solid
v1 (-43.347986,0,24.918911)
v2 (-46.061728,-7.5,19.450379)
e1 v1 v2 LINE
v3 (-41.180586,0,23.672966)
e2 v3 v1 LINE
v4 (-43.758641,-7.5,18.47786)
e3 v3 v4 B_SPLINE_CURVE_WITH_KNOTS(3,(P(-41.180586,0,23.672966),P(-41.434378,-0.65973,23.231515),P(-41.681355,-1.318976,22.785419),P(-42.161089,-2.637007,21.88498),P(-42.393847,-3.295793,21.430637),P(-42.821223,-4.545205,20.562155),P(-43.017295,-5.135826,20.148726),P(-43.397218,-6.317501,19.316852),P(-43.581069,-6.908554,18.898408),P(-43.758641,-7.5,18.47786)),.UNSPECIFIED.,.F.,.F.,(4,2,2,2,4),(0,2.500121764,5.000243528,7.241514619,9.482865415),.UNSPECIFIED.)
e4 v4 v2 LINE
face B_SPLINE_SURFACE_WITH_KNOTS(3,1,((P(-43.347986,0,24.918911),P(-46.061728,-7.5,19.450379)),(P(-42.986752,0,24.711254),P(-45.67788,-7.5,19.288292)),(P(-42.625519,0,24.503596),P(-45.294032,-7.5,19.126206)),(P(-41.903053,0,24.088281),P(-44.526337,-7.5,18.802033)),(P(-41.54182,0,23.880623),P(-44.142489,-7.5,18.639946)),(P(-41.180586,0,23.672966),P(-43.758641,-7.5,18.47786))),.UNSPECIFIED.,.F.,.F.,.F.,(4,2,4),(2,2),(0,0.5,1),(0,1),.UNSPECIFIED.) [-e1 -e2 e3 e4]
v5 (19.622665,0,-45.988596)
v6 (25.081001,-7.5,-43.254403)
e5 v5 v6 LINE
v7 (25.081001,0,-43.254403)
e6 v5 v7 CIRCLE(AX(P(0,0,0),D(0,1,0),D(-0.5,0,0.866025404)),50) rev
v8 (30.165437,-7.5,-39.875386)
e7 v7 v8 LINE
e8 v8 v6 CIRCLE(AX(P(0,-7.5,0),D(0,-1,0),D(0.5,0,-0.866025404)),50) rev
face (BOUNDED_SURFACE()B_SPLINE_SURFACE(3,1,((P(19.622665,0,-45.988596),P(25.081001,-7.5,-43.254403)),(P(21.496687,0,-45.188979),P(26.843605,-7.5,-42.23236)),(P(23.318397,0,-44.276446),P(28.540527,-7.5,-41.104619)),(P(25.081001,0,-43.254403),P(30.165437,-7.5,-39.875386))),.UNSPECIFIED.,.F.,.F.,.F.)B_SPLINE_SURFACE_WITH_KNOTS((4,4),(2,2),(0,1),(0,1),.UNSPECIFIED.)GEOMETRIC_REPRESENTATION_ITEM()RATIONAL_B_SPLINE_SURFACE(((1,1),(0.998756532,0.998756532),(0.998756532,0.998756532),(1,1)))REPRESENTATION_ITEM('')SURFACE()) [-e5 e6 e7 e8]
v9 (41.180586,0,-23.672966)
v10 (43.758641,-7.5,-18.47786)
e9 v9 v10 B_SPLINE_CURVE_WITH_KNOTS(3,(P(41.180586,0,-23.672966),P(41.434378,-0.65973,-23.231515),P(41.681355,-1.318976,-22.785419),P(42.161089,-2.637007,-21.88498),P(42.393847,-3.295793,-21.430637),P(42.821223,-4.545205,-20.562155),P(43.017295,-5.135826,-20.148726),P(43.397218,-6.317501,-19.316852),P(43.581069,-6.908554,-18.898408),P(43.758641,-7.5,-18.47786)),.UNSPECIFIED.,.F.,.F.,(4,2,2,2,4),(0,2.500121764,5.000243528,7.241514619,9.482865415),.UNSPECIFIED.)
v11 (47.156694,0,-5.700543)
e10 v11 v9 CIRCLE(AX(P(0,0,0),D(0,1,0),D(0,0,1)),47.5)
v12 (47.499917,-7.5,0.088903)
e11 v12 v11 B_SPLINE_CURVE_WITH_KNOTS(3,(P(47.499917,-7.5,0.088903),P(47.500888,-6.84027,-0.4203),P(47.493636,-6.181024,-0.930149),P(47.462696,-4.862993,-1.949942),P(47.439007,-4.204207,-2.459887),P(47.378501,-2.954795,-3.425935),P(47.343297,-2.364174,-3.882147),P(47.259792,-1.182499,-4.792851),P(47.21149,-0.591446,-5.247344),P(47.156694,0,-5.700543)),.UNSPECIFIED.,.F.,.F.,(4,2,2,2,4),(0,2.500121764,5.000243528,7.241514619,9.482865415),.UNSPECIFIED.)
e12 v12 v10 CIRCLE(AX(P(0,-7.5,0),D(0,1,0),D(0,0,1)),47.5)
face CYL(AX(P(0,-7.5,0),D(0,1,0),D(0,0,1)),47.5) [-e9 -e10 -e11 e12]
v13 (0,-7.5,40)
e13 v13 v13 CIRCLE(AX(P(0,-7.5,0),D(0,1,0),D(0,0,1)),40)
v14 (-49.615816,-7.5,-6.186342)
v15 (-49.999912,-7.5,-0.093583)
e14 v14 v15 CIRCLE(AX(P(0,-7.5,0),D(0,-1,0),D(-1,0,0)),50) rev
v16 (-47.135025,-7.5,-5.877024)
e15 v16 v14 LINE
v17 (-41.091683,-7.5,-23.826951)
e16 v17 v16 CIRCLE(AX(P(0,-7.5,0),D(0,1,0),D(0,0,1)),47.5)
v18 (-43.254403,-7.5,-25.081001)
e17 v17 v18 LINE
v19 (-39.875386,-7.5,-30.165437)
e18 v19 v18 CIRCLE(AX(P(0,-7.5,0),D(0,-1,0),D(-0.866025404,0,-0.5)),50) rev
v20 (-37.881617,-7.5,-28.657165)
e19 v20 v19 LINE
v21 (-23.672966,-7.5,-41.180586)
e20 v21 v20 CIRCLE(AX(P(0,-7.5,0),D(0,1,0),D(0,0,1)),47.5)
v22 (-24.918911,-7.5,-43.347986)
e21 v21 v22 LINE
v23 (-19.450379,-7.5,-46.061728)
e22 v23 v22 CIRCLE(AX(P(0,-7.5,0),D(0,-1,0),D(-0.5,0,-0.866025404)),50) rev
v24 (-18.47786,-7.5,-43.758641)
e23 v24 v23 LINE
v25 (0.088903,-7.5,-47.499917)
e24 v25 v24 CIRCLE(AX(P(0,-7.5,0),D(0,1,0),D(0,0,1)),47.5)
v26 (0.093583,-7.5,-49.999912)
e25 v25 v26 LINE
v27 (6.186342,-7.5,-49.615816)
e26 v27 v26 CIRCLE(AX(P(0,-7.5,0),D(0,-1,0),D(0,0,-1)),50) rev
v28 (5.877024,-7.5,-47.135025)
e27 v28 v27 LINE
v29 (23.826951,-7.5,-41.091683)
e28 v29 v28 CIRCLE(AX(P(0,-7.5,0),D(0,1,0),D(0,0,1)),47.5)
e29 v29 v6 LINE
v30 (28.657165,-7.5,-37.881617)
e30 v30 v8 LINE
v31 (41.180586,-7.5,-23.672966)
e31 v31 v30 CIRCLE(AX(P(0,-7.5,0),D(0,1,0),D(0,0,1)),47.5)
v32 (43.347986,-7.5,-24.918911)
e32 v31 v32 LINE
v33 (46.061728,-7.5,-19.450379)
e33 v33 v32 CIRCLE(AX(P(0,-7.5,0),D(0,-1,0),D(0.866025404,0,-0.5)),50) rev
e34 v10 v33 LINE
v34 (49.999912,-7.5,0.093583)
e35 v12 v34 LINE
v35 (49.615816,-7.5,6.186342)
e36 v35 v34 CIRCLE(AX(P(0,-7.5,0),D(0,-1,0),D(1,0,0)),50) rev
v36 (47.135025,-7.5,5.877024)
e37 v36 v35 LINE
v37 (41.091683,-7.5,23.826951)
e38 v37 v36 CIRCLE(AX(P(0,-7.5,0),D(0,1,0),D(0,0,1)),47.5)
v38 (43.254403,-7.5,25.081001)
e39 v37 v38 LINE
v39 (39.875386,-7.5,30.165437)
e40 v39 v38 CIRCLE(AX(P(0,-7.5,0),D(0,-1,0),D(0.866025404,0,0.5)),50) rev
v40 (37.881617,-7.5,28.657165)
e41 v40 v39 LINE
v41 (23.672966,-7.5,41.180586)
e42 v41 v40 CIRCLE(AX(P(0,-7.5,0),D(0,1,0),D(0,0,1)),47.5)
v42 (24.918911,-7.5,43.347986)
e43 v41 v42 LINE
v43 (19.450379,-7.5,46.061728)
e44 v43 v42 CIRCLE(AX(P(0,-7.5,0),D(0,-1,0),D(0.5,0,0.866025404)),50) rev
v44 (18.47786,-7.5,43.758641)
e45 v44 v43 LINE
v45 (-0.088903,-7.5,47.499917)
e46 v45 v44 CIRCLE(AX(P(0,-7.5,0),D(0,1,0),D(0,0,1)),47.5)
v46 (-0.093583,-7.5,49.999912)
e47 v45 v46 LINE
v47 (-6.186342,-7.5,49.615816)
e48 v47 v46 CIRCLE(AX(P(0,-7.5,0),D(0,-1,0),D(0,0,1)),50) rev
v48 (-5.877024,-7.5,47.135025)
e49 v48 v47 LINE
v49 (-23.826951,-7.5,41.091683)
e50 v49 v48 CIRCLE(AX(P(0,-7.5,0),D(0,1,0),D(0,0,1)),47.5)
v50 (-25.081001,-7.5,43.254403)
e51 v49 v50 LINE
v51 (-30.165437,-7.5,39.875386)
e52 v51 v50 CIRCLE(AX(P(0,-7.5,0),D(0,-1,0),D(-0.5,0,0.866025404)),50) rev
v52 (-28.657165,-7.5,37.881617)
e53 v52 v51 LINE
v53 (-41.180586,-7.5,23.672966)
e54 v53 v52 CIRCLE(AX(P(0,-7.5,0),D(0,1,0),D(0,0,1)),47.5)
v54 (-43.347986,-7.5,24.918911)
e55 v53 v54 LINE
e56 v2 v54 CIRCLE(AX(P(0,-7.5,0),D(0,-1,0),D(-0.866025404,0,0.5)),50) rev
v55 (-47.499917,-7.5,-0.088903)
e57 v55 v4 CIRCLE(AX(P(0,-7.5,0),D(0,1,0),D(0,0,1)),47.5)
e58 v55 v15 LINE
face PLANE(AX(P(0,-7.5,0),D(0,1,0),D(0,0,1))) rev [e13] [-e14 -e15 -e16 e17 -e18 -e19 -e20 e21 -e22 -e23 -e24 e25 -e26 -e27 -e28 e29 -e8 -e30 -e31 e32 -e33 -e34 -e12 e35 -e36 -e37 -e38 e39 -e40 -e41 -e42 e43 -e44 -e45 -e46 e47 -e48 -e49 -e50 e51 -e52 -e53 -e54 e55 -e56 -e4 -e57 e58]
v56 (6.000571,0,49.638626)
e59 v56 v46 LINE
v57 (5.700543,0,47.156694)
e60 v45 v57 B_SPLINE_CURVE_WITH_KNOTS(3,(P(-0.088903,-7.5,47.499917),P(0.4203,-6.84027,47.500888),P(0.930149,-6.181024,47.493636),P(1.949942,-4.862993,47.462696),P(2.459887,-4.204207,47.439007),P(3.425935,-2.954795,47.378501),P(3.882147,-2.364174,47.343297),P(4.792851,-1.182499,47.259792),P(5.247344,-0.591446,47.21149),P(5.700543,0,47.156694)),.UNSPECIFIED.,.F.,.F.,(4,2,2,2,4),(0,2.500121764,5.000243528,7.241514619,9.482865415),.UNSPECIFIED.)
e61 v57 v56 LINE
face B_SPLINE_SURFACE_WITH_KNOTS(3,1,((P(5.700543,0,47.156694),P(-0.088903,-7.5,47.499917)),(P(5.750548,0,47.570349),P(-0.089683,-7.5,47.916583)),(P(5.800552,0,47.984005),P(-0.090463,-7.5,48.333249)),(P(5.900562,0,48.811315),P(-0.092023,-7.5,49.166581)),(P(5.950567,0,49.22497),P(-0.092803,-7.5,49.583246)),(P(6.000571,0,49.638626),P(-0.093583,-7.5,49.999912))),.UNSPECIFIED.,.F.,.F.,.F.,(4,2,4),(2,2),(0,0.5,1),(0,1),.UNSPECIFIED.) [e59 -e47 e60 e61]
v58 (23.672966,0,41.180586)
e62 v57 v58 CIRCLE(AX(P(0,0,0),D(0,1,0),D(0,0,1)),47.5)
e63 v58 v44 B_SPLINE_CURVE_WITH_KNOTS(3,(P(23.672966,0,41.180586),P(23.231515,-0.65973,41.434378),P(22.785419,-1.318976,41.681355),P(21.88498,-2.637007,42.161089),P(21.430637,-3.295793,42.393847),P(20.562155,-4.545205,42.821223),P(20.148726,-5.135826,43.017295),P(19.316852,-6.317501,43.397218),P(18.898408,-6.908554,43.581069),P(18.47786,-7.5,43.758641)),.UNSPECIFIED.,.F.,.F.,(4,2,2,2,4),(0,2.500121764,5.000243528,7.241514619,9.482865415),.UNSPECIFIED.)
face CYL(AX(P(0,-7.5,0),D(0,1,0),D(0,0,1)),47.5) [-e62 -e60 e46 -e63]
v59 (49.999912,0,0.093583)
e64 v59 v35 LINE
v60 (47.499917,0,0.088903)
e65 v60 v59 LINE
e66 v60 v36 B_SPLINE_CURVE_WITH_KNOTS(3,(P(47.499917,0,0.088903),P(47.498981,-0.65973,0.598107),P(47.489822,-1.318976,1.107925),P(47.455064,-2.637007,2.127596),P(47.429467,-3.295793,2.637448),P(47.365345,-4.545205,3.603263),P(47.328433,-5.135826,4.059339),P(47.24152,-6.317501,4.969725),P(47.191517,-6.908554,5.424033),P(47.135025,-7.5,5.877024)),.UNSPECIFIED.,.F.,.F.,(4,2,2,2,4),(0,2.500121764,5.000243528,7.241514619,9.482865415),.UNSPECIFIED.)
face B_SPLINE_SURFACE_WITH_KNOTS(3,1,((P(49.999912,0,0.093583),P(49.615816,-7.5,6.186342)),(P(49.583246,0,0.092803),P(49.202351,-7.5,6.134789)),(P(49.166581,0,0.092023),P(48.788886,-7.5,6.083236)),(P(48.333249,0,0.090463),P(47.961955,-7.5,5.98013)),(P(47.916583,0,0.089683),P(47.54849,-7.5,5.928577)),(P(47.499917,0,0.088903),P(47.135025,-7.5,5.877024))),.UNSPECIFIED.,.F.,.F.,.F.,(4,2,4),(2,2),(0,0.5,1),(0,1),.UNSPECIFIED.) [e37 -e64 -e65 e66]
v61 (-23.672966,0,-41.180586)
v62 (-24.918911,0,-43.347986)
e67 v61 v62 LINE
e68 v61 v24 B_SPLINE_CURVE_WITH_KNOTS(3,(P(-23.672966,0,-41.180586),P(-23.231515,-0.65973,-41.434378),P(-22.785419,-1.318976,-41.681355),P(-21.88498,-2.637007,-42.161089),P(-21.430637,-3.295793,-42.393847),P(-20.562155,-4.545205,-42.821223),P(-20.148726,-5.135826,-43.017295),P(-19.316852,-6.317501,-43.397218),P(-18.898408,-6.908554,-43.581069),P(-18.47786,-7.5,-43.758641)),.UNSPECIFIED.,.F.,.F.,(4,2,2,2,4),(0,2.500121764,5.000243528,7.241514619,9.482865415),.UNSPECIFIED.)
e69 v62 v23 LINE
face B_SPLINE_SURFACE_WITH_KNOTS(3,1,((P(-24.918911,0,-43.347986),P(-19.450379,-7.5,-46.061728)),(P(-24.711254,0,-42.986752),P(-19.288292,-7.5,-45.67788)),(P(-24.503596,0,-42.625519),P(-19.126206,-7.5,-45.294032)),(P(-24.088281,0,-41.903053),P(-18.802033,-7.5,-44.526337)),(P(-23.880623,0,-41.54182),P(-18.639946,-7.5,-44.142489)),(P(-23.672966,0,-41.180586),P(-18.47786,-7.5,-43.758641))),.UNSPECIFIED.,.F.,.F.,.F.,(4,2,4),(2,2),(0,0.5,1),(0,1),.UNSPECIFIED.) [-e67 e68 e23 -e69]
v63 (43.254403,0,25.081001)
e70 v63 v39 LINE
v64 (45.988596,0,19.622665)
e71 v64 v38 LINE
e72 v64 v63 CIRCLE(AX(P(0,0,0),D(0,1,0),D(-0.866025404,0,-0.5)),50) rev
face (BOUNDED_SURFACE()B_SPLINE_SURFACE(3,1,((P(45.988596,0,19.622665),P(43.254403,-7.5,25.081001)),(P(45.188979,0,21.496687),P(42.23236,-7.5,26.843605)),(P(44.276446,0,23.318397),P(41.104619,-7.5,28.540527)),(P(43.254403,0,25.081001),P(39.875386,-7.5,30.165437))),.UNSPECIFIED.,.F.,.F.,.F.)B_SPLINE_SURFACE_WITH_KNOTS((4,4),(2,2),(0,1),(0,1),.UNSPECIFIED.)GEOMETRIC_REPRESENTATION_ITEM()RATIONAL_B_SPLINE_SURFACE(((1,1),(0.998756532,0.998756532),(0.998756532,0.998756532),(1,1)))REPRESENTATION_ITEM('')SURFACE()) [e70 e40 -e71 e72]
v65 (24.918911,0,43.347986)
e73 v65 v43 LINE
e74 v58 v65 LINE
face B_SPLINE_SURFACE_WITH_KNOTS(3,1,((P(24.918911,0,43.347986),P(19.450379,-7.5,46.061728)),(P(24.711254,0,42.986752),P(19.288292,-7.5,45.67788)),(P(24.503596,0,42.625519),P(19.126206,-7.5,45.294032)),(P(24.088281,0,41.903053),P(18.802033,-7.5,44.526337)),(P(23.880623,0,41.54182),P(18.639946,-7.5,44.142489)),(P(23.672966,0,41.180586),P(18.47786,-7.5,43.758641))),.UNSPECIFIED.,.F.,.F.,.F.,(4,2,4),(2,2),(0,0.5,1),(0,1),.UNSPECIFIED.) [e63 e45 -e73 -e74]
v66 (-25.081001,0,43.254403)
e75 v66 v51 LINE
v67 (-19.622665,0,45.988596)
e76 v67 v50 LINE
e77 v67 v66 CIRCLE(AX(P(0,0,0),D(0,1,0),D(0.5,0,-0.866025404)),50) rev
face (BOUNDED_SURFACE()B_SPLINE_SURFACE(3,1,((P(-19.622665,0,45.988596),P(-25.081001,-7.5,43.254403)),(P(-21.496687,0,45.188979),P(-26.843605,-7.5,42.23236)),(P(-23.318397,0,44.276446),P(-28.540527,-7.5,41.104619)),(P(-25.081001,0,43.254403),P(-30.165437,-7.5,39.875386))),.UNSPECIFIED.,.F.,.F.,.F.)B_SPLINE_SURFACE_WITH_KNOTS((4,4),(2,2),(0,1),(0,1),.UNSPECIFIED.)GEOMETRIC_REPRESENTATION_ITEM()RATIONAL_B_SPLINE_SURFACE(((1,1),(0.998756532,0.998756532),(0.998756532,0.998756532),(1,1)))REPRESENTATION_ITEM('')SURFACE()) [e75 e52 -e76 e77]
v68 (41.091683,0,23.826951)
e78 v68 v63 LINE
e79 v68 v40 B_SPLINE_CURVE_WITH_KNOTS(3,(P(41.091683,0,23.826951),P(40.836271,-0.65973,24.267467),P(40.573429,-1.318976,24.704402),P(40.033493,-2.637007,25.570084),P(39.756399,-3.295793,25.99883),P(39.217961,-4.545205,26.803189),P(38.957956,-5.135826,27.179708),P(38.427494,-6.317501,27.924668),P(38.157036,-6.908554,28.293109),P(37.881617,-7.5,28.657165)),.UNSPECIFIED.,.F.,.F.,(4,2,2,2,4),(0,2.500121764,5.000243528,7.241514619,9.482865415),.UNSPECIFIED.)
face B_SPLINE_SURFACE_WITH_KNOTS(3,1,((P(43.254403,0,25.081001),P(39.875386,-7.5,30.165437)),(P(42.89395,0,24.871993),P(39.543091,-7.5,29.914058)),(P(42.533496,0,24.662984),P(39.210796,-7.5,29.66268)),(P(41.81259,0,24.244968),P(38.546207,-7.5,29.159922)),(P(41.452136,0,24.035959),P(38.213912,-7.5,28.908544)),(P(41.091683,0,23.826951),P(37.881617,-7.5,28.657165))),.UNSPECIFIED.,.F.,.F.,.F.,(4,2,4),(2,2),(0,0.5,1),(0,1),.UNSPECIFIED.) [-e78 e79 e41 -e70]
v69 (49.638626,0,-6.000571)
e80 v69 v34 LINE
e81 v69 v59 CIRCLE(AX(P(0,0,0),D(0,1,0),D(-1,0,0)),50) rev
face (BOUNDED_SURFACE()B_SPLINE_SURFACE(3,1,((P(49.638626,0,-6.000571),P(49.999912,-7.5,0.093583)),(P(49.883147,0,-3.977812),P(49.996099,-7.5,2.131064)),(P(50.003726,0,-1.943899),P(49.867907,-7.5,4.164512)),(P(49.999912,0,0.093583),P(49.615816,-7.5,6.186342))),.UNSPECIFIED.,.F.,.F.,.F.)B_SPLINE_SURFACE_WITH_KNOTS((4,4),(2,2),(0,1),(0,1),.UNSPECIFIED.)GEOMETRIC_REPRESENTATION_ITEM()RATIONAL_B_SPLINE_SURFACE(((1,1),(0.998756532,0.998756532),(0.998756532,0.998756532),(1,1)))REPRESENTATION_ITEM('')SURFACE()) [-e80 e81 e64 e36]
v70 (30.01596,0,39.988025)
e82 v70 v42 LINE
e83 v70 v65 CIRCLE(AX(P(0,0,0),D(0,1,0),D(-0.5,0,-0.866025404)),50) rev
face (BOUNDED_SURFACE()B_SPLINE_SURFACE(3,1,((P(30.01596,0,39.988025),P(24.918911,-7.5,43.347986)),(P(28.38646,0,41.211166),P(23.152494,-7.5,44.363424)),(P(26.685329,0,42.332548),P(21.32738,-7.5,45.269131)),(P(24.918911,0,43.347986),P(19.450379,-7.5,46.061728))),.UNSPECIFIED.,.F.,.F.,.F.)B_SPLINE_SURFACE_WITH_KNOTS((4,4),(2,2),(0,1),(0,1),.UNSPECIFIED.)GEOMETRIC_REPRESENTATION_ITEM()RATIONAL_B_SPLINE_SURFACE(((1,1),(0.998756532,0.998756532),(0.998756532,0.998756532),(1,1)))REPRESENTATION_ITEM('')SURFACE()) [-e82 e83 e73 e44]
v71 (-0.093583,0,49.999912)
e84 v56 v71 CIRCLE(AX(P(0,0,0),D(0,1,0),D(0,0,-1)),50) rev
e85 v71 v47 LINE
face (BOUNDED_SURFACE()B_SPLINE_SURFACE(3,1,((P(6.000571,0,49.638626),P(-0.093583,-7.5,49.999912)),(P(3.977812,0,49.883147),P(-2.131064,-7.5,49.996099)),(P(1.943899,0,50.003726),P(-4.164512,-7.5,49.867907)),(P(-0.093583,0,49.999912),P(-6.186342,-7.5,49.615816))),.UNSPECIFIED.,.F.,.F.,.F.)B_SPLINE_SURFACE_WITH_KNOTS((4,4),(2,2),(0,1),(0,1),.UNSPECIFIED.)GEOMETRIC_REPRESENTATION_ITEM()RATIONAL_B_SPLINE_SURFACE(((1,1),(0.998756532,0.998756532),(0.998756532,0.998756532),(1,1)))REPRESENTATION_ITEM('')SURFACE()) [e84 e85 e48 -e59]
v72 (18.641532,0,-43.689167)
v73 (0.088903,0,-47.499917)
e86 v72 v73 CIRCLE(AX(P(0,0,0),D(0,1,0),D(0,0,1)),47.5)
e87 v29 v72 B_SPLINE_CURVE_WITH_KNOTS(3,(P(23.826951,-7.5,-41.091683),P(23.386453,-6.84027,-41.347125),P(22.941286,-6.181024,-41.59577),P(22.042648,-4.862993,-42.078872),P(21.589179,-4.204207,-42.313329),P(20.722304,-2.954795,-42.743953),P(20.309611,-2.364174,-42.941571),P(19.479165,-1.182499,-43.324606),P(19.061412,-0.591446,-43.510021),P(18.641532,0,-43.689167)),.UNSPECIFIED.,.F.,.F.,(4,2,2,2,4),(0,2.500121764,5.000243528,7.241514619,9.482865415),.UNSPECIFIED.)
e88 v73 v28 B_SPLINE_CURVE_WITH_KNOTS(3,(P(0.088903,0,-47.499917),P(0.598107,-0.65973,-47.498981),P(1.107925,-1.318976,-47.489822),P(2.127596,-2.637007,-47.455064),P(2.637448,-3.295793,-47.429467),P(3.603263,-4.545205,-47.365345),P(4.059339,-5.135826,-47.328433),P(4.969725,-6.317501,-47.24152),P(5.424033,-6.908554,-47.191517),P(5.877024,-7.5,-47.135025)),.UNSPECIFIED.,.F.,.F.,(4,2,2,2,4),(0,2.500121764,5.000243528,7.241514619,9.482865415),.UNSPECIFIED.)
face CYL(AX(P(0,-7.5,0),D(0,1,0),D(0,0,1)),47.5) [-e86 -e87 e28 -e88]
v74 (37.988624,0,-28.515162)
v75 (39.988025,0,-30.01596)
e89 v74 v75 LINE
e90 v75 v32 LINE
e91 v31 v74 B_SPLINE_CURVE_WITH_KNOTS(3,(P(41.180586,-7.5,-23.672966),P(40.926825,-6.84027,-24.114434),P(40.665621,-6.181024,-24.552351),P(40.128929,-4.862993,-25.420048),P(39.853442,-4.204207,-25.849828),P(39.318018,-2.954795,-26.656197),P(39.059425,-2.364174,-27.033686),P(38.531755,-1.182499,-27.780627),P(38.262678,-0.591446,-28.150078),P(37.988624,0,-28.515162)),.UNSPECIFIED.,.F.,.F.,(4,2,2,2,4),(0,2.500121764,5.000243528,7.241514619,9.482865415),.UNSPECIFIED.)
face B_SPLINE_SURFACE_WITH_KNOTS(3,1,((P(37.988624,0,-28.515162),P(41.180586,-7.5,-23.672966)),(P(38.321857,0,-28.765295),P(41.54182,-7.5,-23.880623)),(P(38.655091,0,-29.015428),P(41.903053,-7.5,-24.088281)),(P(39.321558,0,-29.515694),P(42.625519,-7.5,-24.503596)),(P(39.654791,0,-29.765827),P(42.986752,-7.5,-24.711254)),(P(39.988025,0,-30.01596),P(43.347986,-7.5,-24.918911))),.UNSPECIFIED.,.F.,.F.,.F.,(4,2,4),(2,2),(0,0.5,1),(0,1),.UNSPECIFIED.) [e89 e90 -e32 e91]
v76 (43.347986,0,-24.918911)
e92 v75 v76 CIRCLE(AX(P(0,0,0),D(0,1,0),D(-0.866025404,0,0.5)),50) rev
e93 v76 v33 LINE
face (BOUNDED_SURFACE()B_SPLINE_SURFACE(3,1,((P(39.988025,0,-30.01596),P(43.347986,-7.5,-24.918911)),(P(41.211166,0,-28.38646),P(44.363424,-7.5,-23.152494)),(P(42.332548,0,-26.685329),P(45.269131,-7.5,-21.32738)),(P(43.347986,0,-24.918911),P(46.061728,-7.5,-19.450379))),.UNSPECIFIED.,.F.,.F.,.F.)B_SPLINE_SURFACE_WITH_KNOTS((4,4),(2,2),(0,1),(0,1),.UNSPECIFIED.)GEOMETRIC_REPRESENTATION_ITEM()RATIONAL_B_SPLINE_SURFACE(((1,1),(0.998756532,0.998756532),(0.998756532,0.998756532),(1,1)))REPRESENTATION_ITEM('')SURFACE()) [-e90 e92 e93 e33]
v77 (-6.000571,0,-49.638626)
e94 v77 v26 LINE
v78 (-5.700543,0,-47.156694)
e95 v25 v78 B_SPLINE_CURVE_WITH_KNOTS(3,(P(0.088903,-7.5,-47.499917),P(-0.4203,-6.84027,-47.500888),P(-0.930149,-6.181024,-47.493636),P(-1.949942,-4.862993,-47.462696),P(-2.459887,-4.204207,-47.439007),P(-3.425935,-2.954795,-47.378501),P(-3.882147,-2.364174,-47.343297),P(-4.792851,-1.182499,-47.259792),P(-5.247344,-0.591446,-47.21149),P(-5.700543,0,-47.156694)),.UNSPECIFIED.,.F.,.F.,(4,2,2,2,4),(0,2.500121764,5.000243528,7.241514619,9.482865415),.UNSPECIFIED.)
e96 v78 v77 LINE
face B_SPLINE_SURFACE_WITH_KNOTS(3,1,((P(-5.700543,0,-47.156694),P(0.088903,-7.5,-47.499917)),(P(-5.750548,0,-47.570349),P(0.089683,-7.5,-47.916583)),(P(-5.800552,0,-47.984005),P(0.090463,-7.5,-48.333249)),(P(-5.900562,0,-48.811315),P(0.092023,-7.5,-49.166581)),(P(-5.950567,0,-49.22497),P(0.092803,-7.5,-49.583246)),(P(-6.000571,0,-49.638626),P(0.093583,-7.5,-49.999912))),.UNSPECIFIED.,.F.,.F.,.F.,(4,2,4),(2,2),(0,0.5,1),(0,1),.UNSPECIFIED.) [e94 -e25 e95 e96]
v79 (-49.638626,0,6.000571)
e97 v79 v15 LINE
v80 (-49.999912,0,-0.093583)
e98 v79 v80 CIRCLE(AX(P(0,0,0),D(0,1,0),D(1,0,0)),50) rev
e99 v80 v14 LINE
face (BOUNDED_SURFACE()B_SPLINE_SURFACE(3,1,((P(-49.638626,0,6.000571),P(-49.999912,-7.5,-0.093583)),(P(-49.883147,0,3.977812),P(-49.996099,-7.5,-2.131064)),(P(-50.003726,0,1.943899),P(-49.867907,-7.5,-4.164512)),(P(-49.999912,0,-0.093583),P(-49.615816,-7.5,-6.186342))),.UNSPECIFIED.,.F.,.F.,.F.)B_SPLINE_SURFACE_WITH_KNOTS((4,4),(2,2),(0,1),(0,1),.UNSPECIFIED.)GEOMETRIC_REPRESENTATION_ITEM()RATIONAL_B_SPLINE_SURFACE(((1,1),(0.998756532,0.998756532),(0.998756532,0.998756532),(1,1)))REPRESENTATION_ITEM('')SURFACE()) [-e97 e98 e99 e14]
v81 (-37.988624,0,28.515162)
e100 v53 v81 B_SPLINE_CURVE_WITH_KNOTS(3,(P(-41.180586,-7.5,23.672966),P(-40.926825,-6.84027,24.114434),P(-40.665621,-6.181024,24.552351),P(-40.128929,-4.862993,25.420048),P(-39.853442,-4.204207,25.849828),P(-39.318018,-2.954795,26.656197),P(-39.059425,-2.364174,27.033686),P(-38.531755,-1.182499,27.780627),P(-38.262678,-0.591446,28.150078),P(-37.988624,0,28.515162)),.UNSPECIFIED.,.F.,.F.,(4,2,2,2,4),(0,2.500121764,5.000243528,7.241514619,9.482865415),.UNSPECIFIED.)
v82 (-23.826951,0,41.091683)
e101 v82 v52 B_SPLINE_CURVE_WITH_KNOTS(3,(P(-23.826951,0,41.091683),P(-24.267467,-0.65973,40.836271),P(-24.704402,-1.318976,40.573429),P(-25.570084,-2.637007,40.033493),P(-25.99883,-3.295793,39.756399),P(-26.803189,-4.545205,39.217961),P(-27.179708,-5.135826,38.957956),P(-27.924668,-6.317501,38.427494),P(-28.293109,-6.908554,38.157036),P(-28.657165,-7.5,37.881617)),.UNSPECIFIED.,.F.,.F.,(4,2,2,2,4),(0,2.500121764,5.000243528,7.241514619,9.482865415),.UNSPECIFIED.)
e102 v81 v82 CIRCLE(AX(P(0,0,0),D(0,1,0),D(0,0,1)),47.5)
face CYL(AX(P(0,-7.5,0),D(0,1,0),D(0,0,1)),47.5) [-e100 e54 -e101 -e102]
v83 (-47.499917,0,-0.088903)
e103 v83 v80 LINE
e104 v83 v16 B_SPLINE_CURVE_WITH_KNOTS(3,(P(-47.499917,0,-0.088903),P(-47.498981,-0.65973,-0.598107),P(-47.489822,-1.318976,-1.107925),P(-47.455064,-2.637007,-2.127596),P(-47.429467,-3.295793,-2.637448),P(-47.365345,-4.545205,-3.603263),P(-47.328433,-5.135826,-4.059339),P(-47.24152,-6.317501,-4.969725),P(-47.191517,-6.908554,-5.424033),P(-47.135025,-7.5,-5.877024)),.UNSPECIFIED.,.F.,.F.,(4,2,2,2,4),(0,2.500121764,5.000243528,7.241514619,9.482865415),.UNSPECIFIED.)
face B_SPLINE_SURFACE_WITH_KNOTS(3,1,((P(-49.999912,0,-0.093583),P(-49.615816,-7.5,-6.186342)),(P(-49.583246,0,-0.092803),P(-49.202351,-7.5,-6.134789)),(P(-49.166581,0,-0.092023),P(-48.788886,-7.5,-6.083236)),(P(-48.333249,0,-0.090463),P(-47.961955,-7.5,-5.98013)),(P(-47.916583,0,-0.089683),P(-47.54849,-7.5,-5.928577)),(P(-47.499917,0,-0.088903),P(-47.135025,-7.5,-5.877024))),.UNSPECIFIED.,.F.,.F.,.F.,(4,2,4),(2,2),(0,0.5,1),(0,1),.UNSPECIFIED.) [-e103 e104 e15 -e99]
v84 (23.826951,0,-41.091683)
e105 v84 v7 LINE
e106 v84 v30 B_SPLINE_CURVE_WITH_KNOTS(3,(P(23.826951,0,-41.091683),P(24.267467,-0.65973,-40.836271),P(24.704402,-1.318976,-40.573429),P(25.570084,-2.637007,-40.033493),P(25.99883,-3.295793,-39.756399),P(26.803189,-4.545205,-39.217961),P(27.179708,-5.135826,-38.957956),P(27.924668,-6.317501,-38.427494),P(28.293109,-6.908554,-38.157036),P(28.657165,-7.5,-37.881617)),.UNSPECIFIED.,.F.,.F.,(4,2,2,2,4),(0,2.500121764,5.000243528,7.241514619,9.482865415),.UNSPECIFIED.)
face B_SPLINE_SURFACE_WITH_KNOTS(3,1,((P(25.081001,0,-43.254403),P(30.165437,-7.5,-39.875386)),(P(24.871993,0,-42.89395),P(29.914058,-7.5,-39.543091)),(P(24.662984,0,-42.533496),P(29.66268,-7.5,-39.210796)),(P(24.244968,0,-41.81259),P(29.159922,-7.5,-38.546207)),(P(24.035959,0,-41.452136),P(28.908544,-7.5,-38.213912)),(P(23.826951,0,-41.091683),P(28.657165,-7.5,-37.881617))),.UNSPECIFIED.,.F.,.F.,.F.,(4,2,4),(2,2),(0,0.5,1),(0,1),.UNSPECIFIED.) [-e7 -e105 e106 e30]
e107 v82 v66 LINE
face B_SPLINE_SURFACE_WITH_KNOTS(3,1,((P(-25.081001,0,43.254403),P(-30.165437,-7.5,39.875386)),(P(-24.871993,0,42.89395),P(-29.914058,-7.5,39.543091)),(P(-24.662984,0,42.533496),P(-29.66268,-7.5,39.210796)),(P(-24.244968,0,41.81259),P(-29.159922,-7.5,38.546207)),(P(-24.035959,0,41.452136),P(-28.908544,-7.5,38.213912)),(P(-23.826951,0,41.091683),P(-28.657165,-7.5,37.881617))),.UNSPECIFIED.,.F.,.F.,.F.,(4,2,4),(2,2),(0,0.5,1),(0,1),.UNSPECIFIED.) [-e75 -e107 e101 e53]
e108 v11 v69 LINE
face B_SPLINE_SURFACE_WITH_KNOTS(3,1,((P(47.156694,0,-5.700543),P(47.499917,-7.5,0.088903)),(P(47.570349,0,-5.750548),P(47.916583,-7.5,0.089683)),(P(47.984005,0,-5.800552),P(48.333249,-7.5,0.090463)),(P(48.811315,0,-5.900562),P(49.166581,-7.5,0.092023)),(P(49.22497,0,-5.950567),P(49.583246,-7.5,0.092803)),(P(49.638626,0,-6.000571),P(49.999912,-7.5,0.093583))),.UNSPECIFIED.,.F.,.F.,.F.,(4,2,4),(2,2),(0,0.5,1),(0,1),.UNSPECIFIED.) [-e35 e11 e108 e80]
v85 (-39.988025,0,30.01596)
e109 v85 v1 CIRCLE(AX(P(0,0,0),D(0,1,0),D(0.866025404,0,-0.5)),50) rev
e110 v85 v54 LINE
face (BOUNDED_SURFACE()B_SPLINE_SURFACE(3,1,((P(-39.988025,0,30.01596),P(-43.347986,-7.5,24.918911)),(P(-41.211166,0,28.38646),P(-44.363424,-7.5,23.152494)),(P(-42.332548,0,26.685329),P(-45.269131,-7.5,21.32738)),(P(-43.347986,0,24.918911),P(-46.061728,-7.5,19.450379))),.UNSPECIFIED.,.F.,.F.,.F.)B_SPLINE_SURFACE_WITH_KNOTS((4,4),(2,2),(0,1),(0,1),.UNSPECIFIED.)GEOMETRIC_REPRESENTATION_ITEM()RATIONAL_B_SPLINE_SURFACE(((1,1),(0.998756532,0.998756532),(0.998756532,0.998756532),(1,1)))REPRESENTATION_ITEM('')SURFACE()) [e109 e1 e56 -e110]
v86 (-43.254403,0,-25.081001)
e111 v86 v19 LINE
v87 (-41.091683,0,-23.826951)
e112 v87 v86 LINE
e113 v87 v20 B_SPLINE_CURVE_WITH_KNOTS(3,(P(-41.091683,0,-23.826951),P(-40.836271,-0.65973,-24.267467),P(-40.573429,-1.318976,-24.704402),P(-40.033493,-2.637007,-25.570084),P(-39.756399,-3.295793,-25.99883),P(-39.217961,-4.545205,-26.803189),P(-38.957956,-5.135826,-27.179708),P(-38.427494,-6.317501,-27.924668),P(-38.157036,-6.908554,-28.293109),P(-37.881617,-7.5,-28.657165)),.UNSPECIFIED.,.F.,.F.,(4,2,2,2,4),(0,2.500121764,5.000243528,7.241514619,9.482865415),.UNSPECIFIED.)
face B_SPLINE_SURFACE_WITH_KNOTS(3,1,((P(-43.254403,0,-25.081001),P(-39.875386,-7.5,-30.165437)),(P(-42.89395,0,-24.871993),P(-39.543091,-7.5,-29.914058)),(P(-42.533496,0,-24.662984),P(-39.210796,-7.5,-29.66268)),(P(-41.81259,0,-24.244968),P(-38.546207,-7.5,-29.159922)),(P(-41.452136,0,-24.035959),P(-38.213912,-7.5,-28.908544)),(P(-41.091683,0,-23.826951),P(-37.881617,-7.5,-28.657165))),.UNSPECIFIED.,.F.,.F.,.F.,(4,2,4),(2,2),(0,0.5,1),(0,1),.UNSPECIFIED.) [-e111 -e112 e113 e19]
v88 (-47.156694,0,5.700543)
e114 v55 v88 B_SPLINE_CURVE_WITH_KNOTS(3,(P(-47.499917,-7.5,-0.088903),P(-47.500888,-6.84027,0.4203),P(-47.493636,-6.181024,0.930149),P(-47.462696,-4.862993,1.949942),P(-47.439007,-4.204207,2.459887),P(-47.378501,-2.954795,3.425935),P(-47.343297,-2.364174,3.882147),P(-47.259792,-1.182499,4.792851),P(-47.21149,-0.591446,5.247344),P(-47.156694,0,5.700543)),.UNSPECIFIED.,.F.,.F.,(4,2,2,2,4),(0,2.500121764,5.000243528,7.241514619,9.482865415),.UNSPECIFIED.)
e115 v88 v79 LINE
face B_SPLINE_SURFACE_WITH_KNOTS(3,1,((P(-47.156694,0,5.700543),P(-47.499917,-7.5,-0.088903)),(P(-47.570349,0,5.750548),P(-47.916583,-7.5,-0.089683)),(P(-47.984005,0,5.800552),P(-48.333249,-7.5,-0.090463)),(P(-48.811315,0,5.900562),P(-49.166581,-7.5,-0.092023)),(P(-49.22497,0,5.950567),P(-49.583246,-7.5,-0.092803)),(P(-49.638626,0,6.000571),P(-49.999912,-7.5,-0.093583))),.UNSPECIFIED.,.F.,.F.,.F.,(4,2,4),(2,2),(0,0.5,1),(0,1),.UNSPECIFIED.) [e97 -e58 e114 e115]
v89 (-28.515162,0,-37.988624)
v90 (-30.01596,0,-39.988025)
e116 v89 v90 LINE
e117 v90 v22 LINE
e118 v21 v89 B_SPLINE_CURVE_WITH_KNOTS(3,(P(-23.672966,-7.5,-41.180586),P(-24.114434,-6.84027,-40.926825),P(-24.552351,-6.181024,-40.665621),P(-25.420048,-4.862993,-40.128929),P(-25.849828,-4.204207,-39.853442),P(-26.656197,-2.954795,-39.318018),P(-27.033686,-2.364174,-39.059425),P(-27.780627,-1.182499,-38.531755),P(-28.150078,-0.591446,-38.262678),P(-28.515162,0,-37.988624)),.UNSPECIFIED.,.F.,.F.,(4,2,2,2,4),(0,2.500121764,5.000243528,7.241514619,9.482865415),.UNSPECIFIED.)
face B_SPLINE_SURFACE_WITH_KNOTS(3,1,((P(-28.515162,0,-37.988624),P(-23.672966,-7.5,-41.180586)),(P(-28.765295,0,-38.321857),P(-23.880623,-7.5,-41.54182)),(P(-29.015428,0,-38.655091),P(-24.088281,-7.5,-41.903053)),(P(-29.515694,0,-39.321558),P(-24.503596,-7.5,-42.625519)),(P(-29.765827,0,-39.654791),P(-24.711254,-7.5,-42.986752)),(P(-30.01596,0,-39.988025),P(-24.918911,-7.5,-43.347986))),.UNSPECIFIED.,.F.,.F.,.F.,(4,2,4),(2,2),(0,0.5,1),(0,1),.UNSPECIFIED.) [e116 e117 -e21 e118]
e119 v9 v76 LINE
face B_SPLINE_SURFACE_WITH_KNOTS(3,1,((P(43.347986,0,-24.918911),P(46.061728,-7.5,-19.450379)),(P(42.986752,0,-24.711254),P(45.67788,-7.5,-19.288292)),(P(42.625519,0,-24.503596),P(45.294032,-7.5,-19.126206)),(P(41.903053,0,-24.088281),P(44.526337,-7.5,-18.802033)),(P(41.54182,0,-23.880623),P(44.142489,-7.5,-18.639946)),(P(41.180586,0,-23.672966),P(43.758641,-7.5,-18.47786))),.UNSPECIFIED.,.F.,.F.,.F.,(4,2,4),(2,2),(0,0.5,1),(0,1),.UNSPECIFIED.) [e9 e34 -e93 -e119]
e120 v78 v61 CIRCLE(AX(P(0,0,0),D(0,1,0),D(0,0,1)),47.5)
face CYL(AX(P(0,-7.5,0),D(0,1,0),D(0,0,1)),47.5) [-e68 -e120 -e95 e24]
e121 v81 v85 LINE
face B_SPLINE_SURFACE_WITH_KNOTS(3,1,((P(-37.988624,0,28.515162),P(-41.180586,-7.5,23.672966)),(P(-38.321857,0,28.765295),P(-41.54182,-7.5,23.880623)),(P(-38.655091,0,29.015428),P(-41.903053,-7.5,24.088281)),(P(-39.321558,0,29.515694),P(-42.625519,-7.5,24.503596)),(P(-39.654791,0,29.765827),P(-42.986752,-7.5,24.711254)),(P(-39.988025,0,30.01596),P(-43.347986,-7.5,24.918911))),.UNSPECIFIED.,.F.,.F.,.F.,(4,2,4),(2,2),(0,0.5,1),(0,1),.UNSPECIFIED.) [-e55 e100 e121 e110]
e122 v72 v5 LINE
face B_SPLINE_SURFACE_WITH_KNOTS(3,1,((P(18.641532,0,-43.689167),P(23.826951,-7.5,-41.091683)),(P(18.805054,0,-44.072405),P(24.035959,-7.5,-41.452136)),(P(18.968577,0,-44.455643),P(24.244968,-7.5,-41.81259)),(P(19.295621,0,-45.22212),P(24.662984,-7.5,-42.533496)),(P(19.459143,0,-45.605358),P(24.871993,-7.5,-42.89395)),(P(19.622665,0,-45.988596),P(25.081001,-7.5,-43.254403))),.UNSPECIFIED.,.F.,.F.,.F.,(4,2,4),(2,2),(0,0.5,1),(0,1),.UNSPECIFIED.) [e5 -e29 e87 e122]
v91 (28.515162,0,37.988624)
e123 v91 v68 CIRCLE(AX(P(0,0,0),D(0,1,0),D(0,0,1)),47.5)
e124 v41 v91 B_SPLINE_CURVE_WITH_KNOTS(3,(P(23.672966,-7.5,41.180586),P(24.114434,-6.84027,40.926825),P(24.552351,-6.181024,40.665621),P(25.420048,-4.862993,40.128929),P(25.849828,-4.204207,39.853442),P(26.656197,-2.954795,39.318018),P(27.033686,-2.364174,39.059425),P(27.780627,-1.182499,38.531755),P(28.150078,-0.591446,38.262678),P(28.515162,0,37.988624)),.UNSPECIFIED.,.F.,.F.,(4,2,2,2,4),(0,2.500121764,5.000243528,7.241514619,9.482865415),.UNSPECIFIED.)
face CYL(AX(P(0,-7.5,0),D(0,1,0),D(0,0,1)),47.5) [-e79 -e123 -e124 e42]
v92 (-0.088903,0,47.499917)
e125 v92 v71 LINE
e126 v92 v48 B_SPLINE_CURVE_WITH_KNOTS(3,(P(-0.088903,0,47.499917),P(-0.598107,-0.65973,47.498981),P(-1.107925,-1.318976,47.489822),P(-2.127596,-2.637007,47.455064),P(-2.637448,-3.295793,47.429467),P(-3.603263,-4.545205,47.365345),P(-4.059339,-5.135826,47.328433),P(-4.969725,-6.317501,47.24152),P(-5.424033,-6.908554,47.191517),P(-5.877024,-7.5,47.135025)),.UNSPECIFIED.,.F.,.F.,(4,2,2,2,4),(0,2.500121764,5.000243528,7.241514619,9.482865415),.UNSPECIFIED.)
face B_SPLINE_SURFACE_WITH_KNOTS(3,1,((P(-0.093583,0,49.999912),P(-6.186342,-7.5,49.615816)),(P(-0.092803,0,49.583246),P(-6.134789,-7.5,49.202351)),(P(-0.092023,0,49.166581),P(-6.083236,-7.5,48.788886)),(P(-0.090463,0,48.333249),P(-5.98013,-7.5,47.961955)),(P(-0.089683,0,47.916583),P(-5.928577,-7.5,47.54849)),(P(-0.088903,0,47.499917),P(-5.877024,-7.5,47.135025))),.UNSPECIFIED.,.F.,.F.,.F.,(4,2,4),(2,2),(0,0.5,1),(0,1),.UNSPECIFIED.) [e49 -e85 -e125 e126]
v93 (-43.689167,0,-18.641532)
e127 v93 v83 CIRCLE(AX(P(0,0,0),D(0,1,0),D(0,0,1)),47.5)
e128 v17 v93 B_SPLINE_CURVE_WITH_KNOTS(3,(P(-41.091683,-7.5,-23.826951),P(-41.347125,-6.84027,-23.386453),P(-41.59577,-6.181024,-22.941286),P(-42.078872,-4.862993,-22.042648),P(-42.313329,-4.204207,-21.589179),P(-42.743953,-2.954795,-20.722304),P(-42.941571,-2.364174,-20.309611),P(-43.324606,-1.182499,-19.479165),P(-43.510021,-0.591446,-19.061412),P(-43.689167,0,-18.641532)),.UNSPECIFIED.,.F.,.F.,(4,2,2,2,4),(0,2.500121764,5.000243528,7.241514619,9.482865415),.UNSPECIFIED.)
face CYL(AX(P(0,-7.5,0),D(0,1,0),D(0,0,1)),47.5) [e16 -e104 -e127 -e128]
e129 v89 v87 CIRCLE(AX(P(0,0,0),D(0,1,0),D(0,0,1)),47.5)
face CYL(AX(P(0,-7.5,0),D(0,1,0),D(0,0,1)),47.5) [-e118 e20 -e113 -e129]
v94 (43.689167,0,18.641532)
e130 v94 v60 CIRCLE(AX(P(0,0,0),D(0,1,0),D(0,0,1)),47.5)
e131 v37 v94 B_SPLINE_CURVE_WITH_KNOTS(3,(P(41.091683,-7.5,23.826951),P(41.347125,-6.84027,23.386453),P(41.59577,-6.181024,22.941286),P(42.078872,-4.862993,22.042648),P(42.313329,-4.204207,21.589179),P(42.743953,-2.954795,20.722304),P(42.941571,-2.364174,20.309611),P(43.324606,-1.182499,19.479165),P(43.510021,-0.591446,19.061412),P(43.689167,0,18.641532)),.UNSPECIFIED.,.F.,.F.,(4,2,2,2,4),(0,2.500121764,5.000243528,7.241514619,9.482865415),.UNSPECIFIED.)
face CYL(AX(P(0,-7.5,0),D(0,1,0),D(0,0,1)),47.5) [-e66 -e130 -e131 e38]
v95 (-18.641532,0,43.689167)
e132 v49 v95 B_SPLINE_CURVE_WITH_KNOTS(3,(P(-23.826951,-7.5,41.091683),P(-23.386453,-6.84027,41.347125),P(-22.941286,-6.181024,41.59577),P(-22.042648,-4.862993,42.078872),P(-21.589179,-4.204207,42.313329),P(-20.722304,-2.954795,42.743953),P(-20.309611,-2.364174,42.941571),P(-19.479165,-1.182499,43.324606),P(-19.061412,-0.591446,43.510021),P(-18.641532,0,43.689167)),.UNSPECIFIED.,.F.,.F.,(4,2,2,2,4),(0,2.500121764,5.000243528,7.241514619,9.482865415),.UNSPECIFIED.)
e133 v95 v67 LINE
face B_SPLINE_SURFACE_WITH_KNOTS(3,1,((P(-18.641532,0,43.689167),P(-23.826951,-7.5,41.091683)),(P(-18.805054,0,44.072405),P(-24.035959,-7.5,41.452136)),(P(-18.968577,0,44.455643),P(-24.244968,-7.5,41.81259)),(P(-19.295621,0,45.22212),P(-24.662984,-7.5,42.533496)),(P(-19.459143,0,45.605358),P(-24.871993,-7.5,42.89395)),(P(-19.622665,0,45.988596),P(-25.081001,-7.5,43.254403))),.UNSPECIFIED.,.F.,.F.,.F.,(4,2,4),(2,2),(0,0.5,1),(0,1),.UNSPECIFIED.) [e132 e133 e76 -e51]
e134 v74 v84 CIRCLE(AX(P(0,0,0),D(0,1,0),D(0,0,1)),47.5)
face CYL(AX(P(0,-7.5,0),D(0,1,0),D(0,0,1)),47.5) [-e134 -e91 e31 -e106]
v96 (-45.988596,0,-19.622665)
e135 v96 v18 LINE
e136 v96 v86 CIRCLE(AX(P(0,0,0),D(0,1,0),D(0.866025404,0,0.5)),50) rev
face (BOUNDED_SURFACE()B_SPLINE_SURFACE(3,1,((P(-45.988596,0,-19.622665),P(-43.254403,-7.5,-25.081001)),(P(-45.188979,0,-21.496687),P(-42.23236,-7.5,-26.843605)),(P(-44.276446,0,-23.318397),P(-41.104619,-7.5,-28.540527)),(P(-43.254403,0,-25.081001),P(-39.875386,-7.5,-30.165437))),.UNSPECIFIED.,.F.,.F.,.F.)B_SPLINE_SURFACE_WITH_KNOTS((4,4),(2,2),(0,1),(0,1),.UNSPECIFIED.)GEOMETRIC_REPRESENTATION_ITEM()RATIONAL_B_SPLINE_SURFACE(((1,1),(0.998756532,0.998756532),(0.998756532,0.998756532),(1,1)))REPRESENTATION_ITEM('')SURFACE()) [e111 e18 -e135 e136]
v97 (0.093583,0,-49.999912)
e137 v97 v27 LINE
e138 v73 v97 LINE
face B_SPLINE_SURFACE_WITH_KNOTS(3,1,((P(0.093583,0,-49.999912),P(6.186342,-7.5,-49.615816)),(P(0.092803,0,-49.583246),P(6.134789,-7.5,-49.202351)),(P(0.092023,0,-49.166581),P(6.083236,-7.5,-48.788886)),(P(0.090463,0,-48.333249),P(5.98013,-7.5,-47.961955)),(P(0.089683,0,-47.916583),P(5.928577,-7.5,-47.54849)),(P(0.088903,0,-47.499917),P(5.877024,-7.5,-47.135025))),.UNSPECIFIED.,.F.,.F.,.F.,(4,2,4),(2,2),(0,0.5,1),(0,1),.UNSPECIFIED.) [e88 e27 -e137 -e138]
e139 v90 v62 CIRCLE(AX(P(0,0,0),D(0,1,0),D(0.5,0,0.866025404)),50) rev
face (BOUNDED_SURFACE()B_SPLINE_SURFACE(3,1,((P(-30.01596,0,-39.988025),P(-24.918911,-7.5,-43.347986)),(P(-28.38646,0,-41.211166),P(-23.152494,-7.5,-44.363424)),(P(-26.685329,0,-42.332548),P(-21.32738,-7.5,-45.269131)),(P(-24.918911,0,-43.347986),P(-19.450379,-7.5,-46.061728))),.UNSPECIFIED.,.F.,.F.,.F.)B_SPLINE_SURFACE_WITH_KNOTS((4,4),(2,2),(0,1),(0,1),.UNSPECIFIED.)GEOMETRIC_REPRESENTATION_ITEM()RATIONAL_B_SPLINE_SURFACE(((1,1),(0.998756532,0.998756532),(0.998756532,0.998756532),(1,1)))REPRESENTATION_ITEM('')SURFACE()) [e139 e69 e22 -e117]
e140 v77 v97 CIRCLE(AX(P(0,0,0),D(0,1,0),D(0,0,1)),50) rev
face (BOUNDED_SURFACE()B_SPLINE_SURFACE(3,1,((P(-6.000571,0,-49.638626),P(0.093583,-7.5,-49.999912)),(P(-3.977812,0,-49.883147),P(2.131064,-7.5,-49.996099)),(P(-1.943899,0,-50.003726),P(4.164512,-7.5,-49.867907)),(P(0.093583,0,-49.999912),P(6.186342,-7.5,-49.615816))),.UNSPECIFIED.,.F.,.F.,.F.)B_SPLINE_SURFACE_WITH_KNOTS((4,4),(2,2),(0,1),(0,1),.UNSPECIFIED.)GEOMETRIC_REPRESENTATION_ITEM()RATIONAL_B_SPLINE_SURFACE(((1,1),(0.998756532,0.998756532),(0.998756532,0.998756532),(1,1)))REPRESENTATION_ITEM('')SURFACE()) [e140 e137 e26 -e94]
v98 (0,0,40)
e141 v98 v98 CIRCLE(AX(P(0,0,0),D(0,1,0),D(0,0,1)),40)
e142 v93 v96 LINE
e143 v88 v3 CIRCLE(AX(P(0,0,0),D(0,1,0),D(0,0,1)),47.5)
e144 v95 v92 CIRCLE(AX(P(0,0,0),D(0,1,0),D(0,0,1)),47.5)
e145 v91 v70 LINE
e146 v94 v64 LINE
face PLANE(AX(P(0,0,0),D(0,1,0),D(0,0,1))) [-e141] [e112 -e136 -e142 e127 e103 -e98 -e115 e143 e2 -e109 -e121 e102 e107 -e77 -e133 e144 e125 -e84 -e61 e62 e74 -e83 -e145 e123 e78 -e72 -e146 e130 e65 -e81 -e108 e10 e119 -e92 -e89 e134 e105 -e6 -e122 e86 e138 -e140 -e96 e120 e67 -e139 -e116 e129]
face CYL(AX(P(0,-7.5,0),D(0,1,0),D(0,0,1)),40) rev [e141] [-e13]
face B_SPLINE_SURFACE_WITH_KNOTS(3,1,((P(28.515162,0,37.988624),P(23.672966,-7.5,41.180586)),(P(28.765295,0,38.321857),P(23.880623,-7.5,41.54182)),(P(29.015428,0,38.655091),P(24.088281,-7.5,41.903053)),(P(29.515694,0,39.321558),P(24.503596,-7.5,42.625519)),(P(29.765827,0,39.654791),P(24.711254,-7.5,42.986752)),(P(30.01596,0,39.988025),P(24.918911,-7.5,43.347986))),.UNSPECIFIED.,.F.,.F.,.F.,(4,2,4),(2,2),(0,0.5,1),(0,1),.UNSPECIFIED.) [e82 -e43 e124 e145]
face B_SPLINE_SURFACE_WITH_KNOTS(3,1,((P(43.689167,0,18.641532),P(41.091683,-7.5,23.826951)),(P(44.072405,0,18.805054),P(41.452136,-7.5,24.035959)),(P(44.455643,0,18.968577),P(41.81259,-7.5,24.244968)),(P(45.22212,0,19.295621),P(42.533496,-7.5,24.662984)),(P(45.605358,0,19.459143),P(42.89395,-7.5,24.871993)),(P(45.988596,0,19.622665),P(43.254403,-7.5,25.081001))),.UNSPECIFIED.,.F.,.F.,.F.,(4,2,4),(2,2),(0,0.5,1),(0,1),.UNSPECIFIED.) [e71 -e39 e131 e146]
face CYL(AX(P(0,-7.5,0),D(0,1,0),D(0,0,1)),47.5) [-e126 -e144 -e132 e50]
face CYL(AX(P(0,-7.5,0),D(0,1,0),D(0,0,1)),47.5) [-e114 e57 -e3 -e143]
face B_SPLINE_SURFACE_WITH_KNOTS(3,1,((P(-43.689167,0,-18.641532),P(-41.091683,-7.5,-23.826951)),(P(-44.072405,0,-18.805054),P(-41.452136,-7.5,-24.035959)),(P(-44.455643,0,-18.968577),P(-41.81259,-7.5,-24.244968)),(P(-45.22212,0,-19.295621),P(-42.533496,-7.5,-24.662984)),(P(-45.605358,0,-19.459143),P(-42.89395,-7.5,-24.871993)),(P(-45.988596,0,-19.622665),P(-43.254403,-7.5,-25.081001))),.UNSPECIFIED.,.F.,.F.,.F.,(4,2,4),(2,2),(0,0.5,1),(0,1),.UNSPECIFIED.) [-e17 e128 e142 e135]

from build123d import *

# Parameters (mm, degrees)
SKETCH2_R           = 47.5
SKETCH2_R_2         = 40
BOSS_EXTRUDE2_DEPTH = 7.5
CIRPATTERN1_COUNT   = 12


with BuildPart() as part:
    # Sketch2 → Boss-Extrude2 (new body)
    with BuildSketch(Plane(origin=(0, 0, 0), x_dir=(1, 0, 0), z_dir=(0, 1, 0))):
        with Locations(Location((0, 0, 0), (0, 0, 270))):
            Circle(SKETCH2_R)
        with Locations(Location((0, 0, 0), (0, 0, 270))):
            Circle(SKETCH2_R_2, mode=Mode.SUBTRACT)
    extrude(amount=-BOSS_EXTRUDE2_DEPTH)

    # Loft2: read off the stored shape, not the designer's step
    # Loft2: loft between two sections, ruled curve by curve
    loft2_from = [
        Edge.make_bspline([(-5.700542846, 0, -47.156694236), (-5.750547608, 0, -47.570349449), (-5.80055237, 0, -47.984004661), (-5.900561893, 0, -48.811315086), (-5.950566655, 0, -49.224970299), (-6.000571417, 0, -49.638625511)], [0, 0, 0, 0, 0.5, 0.5, 1, 1, 1, 1], 3),
        Edge.make_bspline([(-6.000571417, 0, -49.638625511), (-3.977812454, 0, -49.88314698), (-1.943898665, 0, -50.003725887), (0.093582631, 0, -49.999912423)], [0, 0, 0, 0, 1, 1, 1, 1], 3, [1, 0.998756532, 0.998756532, 1]),
        Edge.make_bspline([(0.093582631, 0, -49.999912423), (0.092802776, 0, -49.583246486), (0.092022921, 0, -49.166580549), (0.09046321, 0, -48.333248675), (0.089683355, 0, -47.916582739), (0.088903499, 0, -47.499916802)], [0, 0, 0, 0, 0.5, 0.5, 1, 1, 1, 1], 3),
        Edge.make_line((0.088903499, 0, -47.499916802), (-5.700542846, 0, -47.156694236)),
    ]
    loft2_to = [
        Edge.make_bspline([(0.088903499, -7.5, -47.499916802), (0.089683355, -7.5, -47.916582739), (0.09046321, -7.5, -48.333248675), (0.092022921, -7.5, -49.166580549), (0.092802776, -7.5, -49.583246486), (0.093582631, -7.5, -49.999912423)], [0, 0, 0, 0, 0.5, 0.5, 1, 1, 1, 1], 3),
        Edge.make_bspline([(0.093582631, -7.5, -49.999912423), (2.131063927, -7.5, -49.996098959), (4.164512103, -7.5, -49.867907351), (6.186341578, -7.5, -49.615815804)], [0, 0, 0, 0, 1, 1, 1, 1], 3, [1, 0.998756532, 0.998756532, 1]),
        Edge.make_bspline([(6.186341578, -7.5, -49.615815804), (6.134788731, -7.5, -49.202350672), (6.083235885, -7.5, -48.78888554), (5.980130192, -7.5, -47.961955277), (5.928577345, -7.5, -47.548490145), (5.877024499, -7.5, -47.135025014)], [0, 0, 0, 0, 0.5, 0.5, 1, 1, 1, 1], 3),
        Edge.make_line((5.877024499, -7.5, -47.135025014), (0.088903499, -7.5, -47.499916802)),
    ]
    loft2 = Solid(Shell([*[Face.make_surface_from_curves(loft2_from[k], loft2_to[k]) for k in range(4)], Face(Wire(loft2_from)), Face(Wire(loft2_to))]))
    add(loft2)

    # CirPattern1: Loft2 ×12 about axis
    cirpattern1_axis = Axis((0, 0, 0), (0, 1, 0))
    for i in range(1, CIRPATTERN1_COUNT):
        add(loft2.rotate(cirpattern1_axis, i * 360 / CIRPATTERN1_COUNT))


solid = part.part
